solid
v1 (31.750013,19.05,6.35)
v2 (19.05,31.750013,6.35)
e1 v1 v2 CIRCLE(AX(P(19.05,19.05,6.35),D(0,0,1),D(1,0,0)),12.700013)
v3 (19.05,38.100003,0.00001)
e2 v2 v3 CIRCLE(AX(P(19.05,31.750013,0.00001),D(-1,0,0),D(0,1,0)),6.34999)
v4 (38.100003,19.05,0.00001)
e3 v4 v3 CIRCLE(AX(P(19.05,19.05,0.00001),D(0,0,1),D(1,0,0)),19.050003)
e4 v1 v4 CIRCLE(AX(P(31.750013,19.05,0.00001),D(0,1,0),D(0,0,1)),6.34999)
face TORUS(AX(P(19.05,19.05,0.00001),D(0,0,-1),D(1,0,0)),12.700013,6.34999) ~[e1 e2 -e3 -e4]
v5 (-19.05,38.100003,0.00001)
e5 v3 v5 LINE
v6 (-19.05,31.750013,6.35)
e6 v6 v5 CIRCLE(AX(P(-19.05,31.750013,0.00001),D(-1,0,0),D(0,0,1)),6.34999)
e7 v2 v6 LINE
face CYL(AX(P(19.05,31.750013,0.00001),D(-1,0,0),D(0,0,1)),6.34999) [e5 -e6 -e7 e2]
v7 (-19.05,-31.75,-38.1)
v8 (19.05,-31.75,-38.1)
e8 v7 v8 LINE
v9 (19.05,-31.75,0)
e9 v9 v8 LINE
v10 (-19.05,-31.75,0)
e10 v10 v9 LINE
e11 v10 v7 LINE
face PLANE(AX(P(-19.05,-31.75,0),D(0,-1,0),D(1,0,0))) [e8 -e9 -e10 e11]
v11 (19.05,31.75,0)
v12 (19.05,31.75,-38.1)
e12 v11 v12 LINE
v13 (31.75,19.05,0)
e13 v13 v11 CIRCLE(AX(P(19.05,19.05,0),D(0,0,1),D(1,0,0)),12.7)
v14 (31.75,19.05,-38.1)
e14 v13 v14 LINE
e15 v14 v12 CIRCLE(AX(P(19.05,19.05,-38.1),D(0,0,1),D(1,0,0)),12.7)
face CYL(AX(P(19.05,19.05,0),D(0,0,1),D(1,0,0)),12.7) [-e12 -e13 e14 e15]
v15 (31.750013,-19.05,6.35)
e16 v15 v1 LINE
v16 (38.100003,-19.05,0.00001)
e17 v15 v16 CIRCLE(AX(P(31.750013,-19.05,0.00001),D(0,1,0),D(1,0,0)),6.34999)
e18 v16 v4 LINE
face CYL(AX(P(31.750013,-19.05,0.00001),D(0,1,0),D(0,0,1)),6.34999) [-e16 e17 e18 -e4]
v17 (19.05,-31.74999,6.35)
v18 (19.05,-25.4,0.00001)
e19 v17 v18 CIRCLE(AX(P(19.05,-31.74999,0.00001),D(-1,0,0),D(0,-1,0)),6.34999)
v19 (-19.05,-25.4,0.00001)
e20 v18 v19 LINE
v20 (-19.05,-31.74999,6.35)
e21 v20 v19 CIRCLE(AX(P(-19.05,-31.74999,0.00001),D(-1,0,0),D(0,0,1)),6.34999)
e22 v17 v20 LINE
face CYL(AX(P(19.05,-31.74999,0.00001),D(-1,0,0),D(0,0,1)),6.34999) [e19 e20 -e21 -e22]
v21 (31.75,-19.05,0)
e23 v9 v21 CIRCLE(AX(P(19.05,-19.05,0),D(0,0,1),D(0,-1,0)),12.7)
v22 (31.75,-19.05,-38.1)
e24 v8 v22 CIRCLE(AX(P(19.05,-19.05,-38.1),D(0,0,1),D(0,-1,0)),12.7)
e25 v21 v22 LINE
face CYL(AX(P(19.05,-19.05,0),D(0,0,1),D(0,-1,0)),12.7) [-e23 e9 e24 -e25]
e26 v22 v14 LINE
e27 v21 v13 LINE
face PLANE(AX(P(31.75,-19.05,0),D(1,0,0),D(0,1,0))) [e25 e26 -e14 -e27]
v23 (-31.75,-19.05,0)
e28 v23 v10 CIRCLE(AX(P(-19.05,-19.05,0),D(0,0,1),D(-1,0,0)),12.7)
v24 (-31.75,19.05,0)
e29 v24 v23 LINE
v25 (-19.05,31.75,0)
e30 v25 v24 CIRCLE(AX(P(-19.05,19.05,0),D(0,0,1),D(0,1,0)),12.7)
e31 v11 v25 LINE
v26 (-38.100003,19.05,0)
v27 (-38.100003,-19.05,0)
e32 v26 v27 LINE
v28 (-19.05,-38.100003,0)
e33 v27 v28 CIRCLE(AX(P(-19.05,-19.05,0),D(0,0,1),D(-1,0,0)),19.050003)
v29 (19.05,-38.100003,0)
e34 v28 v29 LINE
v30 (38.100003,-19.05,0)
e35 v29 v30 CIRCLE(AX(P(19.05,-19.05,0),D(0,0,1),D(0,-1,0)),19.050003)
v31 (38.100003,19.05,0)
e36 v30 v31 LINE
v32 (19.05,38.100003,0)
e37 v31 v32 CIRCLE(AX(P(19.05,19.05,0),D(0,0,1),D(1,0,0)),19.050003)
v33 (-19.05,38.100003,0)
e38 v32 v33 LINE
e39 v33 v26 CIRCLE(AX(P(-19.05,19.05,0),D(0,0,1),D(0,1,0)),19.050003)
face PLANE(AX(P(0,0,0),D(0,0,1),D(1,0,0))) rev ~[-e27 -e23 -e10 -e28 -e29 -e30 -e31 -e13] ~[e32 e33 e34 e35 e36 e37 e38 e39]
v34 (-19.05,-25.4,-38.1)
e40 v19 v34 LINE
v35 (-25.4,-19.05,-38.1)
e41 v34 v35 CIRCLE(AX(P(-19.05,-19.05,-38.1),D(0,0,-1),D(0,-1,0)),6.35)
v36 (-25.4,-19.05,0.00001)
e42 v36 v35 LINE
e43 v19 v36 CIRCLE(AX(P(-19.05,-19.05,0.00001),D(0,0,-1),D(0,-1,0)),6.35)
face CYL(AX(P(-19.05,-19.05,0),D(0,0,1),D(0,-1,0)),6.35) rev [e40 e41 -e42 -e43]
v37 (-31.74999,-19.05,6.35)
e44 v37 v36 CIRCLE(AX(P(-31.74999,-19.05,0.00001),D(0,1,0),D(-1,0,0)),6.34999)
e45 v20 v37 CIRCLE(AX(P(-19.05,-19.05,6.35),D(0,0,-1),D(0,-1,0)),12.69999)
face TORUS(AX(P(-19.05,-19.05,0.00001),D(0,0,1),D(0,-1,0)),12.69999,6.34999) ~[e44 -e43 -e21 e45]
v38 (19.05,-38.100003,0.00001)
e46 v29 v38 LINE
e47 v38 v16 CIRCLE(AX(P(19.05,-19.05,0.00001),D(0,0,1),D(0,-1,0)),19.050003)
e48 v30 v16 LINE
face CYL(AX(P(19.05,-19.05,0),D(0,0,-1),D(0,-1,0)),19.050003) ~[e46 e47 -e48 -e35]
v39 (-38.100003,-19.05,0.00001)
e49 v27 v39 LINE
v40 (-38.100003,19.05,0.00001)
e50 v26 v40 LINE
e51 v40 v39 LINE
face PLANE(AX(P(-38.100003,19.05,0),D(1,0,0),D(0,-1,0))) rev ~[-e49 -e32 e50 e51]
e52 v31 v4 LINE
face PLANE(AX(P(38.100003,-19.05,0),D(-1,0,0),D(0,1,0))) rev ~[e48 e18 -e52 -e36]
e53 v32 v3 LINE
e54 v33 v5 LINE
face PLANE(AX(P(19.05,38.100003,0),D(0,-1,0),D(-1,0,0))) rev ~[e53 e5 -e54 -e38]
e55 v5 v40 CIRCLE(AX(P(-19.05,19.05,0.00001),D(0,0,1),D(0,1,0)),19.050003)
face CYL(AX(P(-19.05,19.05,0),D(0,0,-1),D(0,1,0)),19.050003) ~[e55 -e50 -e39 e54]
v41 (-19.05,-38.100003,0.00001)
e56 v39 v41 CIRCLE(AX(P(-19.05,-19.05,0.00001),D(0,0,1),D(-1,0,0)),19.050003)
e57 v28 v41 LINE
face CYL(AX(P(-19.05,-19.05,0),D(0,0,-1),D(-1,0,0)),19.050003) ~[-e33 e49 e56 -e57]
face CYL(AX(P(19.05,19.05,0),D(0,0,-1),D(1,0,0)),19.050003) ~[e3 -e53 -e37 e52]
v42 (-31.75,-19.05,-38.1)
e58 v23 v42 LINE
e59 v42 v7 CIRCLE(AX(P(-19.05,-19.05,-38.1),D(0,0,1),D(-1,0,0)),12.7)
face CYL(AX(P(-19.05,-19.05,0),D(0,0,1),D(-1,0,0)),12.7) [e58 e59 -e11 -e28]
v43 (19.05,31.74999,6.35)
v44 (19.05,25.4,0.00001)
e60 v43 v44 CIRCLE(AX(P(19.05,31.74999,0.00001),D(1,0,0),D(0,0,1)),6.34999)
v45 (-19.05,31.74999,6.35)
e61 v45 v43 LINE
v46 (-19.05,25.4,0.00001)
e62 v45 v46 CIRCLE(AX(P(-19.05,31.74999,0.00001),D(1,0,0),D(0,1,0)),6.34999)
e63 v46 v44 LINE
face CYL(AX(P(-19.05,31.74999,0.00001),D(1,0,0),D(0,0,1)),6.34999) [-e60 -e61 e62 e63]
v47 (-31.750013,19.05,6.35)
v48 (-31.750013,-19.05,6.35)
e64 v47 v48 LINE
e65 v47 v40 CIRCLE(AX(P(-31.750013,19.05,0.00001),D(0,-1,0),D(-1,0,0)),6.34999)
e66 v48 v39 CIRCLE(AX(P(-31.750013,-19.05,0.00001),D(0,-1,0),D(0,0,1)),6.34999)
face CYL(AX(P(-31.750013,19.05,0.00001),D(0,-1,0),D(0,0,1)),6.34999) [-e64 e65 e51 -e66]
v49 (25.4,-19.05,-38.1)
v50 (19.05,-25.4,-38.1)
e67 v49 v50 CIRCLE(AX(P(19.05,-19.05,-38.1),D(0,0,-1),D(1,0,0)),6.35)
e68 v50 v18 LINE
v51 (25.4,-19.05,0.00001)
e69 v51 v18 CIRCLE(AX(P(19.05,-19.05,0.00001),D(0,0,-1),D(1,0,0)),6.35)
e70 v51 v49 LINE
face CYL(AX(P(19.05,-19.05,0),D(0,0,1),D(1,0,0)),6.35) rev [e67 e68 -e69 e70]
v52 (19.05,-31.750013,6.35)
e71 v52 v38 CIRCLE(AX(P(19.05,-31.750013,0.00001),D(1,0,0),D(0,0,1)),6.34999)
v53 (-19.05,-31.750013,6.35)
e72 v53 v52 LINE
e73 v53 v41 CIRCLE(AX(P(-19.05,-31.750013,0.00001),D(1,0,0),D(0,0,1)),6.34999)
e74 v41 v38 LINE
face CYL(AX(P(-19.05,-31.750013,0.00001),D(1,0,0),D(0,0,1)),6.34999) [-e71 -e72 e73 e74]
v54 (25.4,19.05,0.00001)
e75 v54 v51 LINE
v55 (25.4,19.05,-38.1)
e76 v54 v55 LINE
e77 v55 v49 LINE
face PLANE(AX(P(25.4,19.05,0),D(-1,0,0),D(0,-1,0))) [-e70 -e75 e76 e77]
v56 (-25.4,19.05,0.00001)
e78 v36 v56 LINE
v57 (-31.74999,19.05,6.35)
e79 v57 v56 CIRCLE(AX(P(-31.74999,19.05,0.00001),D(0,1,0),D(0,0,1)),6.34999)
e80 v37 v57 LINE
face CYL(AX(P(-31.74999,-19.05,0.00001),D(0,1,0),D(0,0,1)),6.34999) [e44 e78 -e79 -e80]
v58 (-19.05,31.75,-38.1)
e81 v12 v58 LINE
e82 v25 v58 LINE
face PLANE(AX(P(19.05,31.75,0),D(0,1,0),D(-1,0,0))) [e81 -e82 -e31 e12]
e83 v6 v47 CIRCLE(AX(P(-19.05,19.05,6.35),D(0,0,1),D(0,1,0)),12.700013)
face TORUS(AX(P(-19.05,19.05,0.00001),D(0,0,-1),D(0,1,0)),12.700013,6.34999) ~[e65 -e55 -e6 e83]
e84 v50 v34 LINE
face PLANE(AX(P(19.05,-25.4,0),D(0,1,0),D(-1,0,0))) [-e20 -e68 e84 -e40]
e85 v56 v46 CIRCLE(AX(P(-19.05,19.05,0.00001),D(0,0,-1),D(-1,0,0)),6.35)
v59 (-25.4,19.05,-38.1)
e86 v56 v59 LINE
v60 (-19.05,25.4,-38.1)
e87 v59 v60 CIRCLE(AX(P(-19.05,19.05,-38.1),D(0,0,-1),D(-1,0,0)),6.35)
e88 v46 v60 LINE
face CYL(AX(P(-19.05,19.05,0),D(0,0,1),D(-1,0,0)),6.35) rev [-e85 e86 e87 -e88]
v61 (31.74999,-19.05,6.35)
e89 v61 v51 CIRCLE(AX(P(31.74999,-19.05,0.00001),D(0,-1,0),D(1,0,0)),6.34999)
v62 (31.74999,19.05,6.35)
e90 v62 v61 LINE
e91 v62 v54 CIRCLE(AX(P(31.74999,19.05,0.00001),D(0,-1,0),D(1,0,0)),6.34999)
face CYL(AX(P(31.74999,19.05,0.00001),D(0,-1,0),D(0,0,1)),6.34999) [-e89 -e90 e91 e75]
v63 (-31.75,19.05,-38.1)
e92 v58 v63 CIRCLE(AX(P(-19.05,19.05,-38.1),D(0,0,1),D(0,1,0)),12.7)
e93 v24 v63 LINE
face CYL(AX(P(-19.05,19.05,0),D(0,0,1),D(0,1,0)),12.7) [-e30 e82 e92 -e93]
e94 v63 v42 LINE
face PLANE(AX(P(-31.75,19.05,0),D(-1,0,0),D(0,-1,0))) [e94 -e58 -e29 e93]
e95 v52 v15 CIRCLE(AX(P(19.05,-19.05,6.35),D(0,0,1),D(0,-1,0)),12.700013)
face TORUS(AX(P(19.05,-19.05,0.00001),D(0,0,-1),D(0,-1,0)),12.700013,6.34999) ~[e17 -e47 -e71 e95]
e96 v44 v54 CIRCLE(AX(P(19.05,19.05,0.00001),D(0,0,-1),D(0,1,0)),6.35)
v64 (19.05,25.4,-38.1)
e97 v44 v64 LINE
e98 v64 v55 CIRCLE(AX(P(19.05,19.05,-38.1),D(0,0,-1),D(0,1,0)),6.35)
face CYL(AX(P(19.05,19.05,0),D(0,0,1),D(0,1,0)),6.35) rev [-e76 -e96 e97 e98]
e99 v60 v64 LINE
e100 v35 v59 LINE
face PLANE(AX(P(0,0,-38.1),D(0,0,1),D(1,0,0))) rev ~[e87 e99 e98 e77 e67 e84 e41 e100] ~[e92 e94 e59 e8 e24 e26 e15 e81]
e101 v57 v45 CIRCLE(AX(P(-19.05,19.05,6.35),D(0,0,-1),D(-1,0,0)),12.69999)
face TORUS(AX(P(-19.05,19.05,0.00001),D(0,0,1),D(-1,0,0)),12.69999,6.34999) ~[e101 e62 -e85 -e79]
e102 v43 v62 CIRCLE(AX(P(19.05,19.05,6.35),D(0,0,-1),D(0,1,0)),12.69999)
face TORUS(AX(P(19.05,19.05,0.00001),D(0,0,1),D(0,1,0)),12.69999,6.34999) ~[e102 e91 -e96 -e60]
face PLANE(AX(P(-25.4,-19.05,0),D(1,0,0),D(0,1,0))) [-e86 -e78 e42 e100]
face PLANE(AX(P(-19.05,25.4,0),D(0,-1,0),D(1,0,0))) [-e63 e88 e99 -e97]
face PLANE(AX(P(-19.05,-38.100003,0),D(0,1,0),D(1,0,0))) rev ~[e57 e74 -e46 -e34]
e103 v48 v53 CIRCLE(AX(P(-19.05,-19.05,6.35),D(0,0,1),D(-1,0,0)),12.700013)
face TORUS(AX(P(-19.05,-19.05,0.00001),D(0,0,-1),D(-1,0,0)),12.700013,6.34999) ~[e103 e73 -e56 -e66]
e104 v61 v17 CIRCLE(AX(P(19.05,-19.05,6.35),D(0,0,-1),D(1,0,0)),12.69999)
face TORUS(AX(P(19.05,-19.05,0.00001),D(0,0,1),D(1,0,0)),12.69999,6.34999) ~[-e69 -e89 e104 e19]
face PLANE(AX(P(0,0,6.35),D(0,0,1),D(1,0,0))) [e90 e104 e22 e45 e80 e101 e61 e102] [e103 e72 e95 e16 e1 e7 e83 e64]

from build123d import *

# Parameters (mm, degrees)
F1_DEPTH = 6.35
F2_DEPTH = 38.1
F3_R     = 6.34999


# Not quite as in the source:
# - a fillet or chamfer is up to 0.001 mm smaller than in the source, because OpenCascade refuses the exact size


with BuildPart() as f1:
    # F0 (on Top) → F1 (new body)
    with BuildSketch(Plane.XY):
        with BuildLine():
            Line((-19.05, -38.1000031829), (19.05, -38.1000031829))
            ThreePointArc((19.05, -38.1000031829), (32.5203864322, -32.5203864322), (38.1000031829, -19.05))
            Line((38.1000031829, -19.05), (38.1000031829, 19.05))
            ThreePointArc((38.1000031829, 19.05), (32.5203864322, 32.5203864322), (19.05, 38.1000031829))
            Line((19.05, 38.1000031829), (-19.05, 38.1000031829))
            ThreePointArc((-19.05, 38.1000031829), (-32.5203864322, 32.5203864322), (-38.1000031829, 19.05))
            Line((-38.1000031829, 19.05), (-38.1000031829, -19.05))
            ThreePointArc((-38.1000031829, -19.05), (-32.5203864322, -32.5203864322), (-19.05, -38.1000031829))
        make_face()
        with BuildLine():
            ThreePointArc((-19.05, -31.75), (-28.0302561211, -28.0302561211), (-31.75, -19.05))
            Line((-31.75, -19.05), (-31.75, 19.05))
            ThreePointArc((-31.75, 19.05), (-28.0302561211, 28.0302561211), (-19.05, 31.75))
            Line((-19.05, 31.75), (19.05, 31.75))
            ThreePointArc((19.05, 31.75), (28.0302561211, 28.0302561211), (31.75, 19.05))
            Line((31.75, 19.05), (31.75, -19.05))
            ThreePointArc((31.75, -19.05), (28.0302561211, -28.0302561211), (19.05, -31.75))
            Line((19.05, -31.75), (-19.05, -31.75))
        make_face(mode=Mode.SUBTRACT)
        with BuildLine():
            Line((-31.75, 19.05), (-31.75, -19.05))
            ThreePointArc((-31.75, -19.05), (-28.0302561211, -28.0302561211), (-19.05, -31.75))
            Line((-19.05, -31.75), (19.05, -31.75))
            ThreePointArc((19.05, -31.75), (28.0302561211, -28.0302561211), (31.75, -19.05))
            Line((31.75, -19.05), (31.75, 19.05))
            ThreePointArc((31.75, 19.05), (28.0302561211, 28.0302561211), (19.05, 31.75))
            Line((19.05, 31.75), (-19.05, 31.75))
            ThreePointArc((-19.05, 31.75), (-28.0302561211, 28.0302561211), (-31.75, 19.05))
        make_face()
        with BuildLine():
            Line((19.05, -25.4), (-19.05, -25.4))
            ThreePointArc((-19.05, -25.4), (-23.5401280605, -23.5401280605), (-25.4, -19.05))
            Line((-25.4, -19.05), (-25.4, 19.05))
            ThreePointArc((-25.4, 19.05), (-23.5401280605, 23.5401280605), (-19.05, 25.4))
            Line((-19.05, 25.4), (19.05, 25.4))
            ThreePointArc((19.05, 25.4), (23.5401280605, 23.5401280605), (25.4, 19.05))
            Line((25.4, 19.05), (25.4, -19.05))
            ThreePointArc((25.4, -19.05), (23.5401280605, -23.5401280605), (19.05, -25.4))
        make_face(mode=Mode.SUBTRACT)
    extrude(amount=F1_DEPTH)

    # F0 (on Top) → F2 (join)
    with BuildSketch(Plane.XY):
        with BuildLine():
            Line((-31.75, 19.05), (-31.75, -19.05))
            ThreePointArc((-31.75, -19.05), (-28.0302561211, -28.0302561211), (-19.05, -31.75))
            Line((-19.05, -31.75), (19.05, -31.75))
            ThreePointArc((19.05, -31.75), (28.0302561211, -28.0302561211), (31.75, -19.05))
            Line((31.75, -19.05), (31.75, 19.05))
            ThreePointArc((31.75, 19.05), (28.0302561211, 28.0302561211), (19.05, 31.75))
            Line((19.05, 31.75), (-19.05, 31.75))
            ThreePointArc((-19.05, 31.75), (-28.0302561211, 28.0302561211), (-31.75, 19.05))
        make_face()
        with BuildLine():
            Line((19.05, -25.4), (-19.05, -25.4))
            ThreePointArc((-19.05, -25.4), (-23.5401280605, -23.5401280605), (-25.4, -19.05))
            Line((-25.4, -19.05), (-25.4, 19.05))
            ThreePointArc((-25.4, 19.05), (-23.5401280605, 23.5401280605), (-19.05, 25.4))
            Line((-19.05, 25.4), (19.05, 25.4))
            ThreePointArc((19.05, 25.4), (23.5401280605, 23.5401280605), (25.4, 19.05))
            Line((25.4, 19.05), (25.4, -19.05))
            ThreePointArc((25.4, -19.05), (23.5401280605, -23.5401280605), (19.05, -25.4))
        make_face(mode=Mode.SUBTRACT)
    extrude(amount=-F2_DEPTH)

    # F3 (radius 6.35 in the source; OpenCascade refuses exactly that, so slightly less here)
    f3_edges = [f1.edges().sort_by_distance(p)[0] for p in [
        (23.540128, -23.540128, 6.35),
        (0, -25.4, 6.35),
        (-23.540128, -23.540128, 6.35),
        (-25.4, 0, 6.35),
        (-23.540128, 23.540128, 6.35),
        (0, 25.4, 6.35),
        (23.540128, 23.540128, 6.35),
        (25.4, 0, 6.35),
        (0, -38.100003, 6.35),
        (32.520386, -32.520386, 6.35),
        (38.100003, 0, 6.35),
        (32.520386, 32.520386, 6.35),
        (0, 38.100003, 6.35),
        (-32.520386, 32.520386, 6.35),
        (-38.100003, 0, 6.35),
        (-32.520386, -32.520386, 6.35),
    ]]
    fillet(f3_edges, radius=F3_R)


solid = f1.part
